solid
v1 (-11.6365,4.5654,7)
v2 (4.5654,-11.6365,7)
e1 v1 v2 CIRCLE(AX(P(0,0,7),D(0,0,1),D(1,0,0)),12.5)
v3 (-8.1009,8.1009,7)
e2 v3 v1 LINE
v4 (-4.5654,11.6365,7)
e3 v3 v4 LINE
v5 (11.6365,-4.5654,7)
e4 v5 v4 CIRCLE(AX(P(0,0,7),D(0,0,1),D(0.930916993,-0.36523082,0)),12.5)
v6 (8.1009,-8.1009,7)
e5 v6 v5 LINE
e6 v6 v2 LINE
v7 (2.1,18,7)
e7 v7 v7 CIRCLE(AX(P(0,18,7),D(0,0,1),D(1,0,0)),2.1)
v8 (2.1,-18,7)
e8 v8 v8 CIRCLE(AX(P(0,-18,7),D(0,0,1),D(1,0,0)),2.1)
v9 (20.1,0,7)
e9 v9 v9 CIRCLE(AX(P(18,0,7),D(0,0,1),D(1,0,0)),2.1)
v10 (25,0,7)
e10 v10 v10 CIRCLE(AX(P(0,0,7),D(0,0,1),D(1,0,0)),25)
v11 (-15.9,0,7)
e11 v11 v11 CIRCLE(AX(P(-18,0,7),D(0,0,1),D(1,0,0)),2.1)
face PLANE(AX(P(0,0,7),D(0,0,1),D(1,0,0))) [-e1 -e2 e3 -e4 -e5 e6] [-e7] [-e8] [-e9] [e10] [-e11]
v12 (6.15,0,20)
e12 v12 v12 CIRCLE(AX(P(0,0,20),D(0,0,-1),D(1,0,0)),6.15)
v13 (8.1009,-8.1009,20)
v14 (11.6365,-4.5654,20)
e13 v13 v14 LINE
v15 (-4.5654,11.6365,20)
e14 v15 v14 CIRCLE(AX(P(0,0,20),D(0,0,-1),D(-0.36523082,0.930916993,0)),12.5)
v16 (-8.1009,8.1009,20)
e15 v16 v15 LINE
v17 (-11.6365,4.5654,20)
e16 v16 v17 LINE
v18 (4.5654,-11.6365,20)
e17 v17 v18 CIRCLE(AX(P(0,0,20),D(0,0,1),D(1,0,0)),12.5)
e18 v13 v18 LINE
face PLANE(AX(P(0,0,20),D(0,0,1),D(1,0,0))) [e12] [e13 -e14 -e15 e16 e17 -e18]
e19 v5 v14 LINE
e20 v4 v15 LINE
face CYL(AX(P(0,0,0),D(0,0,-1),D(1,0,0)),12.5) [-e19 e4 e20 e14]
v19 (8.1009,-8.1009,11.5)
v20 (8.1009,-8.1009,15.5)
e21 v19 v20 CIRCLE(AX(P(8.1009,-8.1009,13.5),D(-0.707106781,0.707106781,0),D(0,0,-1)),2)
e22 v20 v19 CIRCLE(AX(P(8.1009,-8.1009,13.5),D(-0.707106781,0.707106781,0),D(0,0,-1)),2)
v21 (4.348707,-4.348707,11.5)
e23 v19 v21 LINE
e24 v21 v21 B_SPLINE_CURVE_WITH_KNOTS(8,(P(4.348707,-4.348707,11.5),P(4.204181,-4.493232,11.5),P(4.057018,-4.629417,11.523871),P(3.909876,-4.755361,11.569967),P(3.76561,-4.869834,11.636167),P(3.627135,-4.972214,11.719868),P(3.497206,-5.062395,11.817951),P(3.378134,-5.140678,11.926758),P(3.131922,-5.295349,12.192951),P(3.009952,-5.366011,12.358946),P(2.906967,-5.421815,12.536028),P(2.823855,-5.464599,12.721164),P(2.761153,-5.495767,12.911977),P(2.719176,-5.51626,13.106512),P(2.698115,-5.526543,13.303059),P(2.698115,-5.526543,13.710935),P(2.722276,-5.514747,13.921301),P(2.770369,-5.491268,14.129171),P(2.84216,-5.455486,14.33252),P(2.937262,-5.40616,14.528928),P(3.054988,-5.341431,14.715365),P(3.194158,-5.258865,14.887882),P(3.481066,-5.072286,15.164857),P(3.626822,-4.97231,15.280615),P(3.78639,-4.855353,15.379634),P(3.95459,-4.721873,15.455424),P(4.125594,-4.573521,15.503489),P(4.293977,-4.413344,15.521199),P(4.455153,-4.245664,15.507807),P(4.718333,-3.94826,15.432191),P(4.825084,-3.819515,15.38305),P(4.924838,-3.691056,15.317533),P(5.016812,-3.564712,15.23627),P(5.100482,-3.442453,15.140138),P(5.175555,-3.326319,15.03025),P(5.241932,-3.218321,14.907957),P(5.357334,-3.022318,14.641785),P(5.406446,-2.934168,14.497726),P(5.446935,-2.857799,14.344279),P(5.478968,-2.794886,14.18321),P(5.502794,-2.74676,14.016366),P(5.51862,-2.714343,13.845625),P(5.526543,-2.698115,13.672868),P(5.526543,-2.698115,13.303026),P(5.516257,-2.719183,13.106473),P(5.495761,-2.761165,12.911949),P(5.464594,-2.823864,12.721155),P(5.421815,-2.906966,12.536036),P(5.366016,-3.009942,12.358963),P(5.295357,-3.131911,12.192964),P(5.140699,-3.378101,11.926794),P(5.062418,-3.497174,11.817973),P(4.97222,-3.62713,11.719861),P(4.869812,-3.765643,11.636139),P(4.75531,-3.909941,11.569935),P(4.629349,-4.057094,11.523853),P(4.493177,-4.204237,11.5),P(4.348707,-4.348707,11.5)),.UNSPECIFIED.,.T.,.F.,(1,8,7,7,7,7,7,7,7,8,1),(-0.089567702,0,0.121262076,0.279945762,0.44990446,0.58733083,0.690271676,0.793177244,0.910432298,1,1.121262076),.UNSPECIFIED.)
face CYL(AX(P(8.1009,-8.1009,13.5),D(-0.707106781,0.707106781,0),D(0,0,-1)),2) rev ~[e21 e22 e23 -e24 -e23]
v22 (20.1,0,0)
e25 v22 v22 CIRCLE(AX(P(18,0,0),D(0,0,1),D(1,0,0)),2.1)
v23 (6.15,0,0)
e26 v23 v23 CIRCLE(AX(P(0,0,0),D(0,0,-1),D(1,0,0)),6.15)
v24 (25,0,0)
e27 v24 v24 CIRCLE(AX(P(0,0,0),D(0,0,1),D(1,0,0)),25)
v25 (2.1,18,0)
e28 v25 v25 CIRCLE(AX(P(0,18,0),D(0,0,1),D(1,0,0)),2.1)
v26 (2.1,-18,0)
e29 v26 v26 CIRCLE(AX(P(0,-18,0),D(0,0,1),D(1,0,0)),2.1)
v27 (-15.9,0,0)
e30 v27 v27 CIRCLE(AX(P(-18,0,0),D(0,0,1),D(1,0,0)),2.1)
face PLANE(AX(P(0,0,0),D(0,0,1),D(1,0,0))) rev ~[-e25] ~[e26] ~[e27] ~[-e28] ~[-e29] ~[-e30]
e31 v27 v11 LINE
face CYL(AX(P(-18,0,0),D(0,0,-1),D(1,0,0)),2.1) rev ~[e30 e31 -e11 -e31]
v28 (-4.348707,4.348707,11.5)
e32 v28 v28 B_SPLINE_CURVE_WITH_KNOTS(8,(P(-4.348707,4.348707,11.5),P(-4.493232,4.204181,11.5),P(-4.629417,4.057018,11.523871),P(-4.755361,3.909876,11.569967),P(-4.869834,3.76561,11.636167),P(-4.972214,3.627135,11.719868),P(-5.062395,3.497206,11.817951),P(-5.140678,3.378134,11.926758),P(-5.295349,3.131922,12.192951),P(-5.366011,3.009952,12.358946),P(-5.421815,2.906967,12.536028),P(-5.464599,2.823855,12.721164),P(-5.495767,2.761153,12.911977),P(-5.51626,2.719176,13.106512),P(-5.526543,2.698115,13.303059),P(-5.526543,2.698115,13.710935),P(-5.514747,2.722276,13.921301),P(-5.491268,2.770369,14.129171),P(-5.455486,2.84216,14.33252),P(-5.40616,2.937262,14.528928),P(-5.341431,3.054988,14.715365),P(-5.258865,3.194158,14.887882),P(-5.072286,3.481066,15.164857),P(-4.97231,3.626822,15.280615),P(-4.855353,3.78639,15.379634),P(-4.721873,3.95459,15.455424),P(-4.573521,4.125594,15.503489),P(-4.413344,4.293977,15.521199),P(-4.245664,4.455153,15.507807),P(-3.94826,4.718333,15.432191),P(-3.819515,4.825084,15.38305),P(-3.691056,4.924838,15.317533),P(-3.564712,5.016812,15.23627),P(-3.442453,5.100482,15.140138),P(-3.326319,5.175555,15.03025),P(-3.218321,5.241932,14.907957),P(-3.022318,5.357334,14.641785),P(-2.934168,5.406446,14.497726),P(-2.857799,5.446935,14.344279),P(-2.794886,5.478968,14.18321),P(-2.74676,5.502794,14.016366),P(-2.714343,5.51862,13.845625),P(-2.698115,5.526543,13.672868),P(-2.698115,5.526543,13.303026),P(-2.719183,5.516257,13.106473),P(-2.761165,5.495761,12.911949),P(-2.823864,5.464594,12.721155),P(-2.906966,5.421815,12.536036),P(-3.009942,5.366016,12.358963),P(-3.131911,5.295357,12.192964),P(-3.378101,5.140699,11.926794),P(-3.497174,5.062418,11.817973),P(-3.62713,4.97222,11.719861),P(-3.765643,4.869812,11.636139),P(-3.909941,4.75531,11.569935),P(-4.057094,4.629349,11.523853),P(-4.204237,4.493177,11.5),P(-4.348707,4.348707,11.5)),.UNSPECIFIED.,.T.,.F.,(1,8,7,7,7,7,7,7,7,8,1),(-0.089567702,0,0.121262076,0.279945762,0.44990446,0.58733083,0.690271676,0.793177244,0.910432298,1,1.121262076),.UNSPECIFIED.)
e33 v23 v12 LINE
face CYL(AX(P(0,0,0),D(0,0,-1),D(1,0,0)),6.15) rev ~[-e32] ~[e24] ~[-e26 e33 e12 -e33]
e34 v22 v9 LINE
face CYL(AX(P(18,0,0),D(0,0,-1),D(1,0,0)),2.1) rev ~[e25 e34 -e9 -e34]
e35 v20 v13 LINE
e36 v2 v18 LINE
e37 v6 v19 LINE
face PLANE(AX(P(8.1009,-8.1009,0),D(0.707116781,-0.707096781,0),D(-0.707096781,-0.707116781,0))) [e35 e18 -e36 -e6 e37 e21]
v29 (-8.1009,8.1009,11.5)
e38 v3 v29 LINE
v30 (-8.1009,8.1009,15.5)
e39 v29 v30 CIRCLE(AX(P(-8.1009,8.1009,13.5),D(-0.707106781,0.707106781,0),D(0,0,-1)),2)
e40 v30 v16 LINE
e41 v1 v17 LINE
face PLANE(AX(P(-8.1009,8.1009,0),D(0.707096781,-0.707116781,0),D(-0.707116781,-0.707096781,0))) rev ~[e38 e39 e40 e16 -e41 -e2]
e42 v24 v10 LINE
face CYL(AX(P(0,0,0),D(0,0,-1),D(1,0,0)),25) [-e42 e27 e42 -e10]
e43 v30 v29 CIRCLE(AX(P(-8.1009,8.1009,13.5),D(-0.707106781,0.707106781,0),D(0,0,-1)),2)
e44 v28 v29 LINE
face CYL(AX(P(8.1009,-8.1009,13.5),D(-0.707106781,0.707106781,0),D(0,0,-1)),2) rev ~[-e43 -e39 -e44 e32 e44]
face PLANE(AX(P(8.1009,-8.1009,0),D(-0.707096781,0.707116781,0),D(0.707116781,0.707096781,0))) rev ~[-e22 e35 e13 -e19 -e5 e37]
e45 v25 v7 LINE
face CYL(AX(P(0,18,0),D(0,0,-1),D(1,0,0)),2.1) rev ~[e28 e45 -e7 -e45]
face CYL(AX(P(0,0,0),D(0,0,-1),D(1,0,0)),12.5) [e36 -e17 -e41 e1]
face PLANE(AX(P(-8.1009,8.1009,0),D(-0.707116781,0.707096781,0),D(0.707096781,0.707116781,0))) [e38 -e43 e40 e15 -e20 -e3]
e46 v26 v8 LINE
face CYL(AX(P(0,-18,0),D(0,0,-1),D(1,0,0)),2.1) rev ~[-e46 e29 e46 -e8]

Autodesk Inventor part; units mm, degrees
ref_plane "YZ Plane" through (0, 0, 0) normal (1, 0, 0) x (0, 1, 0)
ref_plane "XZ Plane" through (0, 0, 0) normal (0, 1, 0) x (-1, 0, 0)
ref_plane "XY Plane" through (0, 0, 0) normal (0, 0, 1) x (1, 0, 0)
sketch "スケッチ1" plane through (0, 0, 0) normal (0, 0, 1) x (1, 0, 0)
  circle A0 centre (0, 0) radius 25
  circle A1 centre (0, 0) radius 6.15
  circle A2 centre (0, 0) radius 12.5
  line L0 (0, 0) -> (-8.8388, 8.8388)
  line L1 (0, 0) -> (12.5, 0) construction
  line L2 (-8.1009, 8.1009) -> (-4.5654, 11.6365)
  line L3 (-8.1009, 8.1009) -> (-11.6365, 4.5654)
  line L4 (8.1009, -8.1009) -> (4.5654, -11.6365)
  line L5 (8.1009, -8.1009) -> (11.6365, -4.5654)
  circle A3 centre (0, 18) radius 2.1
  circle A4 centre (-18, 0) radius 2.1
  circle A5 centre (0, -18) radius 2.1
  circle A6 centre (18, 0) radius 2.1
  dimension "d0" = 50
  dimension "d1" = 12.3
  dimension "d2" = 25
  dimension "d3" = 135
  dimension "d4" = 5
  dimension "d7" = 360
  dimension "d9" = 18
  dimension "d12" = 360
  dimension "d14" = 4.2
  dimension "d17" = 360
extrude "押し出し1" add sketch "スケッチ1" along normal blind 7 contours A0 | L2 L0 A2 | A2 L4 L5 | L0 L3 A2
extrude "押し出し2" add sketch "スケッチ1" along normal blind 20 contours A2 L5 L4 L3 L2
sketch "スケッチ2" plane through (11.6365, -4.5654, 20) normal (0.7071068, -0.7071068, 0) x (-0.7071068, -0.7071068, 0)
  line L0 (10, 0) -> (0, 0) projected
  point P0 (5, 20)
  point P1 (5, 6.5)
  dimension "d23" = 6.5
hole "穴1" at (8.1009, -8.1009, 13.5) direction (-0.7071068, 0.7071068, 0) diameter 4 end through all
properties part number "TH22_3DP_roller_fixer_sn" material "ABS プラスチック"
